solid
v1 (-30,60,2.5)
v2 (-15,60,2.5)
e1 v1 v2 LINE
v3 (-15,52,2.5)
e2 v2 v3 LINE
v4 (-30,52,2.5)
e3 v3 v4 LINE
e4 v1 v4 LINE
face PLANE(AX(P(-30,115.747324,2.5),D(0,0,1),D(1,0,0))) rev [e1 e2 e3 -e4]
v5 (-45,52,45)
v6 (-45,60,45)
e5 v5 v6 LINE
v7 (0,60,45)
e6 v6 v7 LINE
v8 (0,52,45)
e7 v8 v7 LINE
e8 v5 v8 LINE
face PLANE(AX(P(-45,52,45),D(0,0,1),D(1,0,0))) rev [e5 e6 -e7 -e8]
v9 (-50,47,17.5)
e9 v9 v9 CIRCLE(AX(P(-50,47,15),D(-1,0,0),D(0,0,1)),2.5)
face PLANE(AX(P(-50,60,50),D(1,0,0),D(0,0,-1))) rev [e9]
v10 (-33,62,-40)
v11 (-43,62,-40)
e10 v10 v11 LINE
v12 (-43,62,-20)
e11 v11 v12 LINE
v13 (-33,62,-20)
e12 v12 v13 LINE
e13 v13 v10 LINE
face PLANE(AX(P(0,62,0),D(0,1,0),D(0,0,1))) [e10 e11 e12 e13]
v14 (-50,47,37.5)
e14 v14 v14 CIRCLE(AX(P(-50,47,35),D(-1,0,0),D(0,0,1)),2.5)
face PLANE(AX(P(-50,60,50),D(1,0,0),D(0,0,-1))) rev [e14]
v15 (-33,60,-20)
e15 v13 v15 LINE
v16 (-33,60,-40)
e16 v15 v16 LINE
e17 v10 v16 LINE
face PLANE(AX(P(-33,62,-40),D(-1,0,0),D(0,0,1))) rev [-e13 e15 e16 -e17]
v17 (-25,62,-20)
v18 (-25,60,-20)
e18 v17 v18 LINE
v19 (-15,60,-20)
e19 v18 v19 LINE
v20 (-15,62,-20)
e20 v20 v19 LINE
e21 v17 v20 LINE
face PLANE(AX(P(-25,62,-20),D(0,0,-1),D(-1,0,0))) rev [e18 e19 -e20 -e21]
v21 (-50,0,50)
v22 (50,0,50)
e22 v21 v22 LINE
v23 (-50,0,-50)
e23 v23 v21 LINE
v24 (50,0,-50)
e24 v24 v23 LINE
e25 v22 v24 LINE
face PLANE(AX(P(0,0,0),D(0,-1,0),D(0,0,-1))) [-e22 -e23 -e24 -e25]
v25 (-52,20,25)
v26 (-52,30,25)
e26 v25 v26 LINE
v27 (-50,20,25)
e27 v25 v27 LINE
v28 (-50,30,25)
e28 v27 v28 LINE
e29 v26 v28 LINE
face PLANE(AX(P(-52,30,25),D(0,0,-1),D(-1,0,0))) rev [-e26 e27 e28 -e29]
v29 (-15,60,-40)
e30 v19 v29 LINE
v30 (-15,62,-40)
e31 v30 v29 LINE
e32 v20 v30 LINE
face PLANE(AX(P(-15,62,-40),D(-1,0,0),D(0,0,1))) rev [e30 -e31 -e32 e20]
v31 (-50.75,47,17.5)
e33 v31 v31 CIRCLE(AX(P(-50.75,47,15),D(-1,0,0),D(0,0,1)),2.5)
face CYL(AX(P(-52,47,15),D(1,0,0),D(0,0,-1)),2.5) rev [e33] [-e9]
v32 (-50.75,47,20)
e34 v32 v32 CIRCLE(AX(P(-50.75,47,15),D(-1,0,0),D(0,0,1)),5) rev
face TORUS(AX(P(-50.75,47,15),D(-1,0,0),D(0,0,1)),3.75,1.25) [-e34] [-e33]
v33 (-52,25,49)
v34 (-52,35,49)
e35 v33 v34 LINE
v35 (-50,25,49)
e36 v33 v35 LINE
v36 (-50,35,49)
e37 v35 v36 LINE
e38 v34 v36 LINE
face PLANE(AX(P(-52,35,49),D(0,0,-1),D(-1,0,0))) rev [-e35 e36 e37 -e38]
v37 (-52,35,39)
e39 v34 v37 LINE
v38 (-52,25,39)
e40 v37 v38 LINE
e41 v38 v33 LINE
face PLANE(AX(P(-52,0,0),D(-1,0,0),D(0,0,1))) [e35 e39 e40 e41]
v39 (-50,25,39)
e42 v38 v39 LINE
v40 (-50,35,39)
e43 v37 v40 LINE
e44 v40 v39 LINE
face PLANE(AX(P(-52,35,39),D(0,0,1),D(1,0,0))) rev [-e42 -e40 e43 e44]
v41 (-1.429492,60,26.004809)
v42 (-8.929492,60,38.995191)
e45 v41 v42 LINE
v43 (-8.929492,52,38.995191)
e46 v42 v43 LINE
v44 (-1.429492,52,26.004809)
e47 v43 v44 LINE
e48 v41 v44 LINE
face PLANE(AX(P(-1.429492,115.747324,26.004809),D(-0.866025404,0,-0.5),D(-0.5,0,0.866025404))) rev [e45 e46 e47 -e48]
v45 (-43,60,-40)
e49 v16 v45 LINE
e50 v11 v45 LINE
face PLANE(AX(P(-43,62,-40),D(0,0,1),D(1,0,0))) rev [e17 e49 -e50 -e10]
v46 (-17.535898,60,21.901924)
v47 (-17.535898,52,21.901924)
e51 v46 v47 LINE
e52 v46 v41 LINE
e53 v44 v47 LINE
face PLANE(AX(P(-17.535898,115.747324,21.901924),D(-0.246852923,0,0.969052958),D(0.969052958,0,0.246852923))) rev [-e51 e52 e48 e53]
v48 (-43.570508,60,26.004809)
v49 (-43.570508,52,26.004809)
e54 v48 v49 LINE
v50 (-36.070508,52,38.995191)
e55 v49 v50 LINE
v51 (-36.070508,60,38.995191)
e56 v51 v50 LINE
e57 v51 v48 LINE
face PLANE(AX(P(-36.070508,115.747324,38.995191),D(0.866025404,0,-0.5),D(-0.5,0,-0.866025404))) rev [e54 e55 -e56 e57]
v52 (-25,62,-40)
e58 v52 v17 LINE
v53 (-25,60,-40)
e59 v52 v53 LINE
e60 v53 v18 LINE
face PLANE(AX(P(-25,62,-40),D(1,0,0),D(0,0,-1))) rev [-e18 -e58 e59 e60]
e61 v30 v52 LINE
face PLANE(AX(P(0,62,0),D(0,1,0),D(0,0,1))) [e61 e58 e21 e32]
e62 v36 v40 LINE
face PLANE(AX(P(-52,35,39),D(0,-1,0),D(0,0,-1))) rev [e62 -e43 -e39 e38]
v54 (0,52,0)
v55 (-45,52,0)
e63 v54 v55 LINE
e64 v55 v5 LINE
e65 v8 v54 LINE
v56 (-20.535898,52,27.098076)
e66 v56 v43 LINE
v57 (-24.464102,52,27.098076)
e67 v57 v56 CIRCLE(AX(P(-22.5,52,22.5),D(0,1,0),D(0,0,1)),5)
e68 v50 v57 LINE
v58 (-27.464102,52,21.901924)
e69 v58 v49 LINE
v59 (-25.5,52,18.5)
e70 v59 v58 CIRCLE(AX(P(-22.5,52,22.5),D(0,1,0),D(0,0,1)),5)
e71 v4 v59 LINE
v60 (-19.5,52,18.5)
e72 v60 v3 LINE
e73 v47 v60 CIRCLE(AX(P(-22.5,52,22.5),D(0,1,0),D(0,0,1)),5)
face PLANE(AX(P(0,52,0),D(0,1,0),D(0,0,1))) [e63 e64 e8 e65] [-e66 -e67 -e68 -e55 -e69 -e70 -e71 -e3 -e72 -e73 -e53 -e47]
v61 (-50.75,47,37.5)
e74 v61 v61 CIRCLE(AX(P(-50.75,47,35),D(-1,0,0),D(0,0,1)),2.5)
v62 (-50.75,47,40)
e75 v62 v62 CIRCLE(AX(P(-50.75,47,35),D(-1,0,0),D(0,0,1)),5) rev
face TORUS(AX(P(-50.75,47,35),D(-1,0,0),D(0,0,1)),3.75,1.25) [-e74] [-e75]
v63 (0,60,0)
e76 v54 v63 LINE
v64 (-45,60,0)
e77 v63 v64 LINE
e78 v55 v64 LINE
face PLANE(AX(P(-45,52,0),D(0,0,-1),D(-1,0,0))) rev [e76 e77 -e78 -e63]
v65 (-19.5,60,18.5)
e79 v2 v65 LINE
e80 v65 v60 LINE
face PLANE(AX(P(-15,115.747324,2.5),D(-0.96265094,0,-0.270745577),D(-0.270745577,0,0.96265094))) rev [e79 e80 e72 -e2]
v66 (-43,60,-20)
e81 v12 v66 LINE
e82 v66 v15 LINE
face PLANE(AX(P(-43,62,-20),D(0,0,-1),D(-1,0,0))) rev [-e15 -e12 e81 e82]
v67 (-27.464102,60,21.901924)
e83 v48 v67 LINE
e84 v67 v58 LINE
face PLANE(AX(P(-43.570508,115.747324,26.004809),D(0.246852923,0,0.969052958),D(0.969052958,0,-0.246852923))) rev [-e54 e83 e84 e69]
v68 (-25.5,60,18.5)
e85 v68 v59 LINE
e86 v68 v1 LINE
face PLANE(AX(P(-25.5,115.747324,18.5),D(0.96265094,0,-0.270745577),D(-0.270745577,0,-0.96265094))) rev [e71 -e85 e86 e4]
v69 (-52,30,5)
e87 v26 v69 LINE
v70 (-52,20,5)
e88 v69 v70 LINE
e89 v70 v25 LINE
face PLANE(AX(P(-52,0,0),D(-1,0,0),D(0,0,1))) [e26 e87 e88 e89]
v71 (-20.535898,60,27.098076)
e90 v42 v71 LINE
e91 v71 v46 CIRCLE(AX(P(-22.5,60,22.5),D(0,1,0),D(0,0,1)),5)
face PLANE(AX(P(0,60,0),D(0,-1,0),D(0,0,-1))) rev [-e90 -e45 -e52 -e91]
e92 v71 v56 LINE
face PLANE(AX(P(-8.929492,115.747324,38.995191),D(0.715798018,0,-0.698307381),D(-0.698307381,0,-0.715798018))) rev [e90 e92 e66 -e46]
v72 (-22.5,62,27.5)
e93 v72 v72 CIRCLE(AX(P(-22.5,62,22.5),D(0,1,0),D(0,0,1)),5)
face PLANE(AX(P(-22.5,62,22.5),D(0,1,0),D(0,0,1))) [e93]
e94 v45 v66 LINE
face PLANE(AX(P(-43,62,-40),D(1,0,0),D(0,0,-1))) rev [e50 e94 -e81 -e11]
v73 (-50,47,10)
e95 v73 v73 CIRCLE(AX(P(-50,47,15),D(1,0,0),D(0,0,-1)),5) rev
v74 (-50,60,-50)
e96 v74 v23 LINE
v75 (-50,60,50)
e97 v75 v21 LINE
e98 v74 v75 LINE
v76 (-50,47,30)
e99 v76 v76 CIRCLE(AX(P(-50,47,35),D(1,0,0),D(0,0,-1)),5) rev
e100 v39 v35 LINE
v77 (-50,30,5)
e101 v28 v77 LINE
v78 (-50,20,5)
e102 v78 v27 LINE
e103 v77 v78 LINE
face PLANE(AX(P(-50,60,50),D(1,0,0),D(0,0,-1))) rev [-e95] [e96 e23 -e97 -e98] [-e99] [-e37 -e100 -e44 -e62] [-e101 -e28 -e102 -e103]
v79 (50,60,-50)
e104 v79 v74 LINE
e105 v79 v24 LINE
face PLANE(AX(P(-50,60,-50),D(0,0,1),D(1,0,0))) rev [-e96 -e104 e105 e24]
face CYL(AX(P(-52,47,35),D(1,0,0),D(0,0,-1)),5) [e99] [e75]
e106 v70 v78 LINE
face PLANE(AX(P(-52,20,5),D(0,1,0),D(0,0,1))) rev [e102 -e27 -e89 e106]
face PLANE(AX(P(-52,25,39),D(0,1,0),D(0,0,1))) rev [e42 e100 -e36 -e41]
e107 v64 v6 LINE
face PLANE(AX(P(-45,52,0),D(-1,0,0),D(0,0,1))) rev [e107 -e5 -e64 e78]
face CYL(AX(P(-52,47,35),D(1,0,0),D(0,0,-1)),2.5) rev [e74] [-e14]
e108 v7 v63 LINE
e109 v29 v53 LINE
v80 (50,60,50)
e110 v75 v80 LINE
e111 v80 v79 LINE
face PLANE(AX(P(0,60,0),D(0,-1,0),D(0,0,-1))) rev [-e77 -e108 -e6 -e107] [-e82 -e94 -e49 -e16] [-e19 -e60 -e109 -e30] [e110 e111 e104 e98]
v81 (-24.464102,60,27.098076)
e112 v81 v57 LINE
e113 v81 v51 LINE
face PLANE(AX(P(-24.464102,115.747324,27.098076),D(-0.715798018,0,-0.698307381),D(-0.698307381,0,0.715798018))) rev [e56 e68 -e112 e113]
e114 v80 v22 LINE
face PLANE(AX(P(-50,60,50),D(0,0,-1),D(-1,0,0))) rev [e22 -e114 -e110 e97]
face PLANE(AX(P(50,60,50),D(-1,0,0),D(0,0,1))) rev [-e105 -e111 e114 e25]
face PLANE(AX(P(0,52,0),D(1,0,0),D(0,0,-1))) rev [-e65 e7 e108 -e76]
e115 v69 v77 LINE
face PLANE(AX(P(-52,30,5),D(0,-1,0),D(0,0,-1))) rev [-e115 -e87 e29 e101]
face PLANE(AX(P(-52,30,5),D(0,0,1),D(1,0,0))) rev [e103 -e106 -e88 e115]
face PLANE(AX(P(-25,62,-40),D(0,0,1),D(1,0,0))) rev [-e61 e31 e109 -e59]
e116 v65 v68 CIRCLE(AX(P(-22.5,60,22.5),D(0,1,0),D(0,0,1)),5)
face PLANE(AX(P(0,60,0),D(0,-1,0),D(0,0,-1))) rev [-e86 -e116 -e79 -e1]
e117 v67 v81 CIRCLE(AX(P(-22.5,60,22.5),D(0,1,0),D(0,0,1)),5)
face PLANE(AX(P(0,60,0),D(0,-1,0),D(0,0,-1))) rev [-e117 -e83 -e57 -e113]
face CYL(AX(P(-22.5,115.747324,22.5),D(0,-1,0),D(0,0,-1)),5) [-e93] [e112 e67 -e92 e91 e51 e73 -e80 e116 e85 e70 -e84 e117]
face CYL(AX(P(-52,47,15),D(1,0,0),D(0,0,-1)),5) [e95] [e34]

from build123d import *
from build123d.topology import SkipClean

# Parameters (mm, degrees)
SKETCH_1_W          = 100
SKETCH_1_H          = 100
EXTRUDE_1_DEPTH     = 60
SKETCH_2_W          = 45
SKETCH_2_H          = 45
CUT_EXTRUDE_1_DEPTH = 8
SKETCH_3_W          = 10
SKETCH_3_H          = 20
EXTRUDE_2_DEPTH     = 2
SKETCH_4_W          = 20
SKETCH_4_H          = 10
SKETCH_4_W_2        = 10
EXTRUDE_3_DEPTH     = 2
SKETCH_5_R          = 5
SKETCH_5_R_2        = 2.5
EXTRUDE_4_DEPTH     = 2
FILLET_1_R          = 1.25
FILLET_2_R          = 1.25
EXTRUDE_5_DEPTH     = 8
SKETCH_7_R          = 5
EXTRUDE_6_DEPTH     = 2


with BuildPart() as part:
    # 草图1 → 凸台-拉伸1 (new body)
    with BuildSketch(Plane(origin=(0, 0, 0), x_dir=(1, 0, 0), z_dir=(0, 1, 0))):
        Rectangle(SKETCH_1_W, SKETCH_1_H)
    extrude(amount=EXTRUDE_1_DEPTH)

    # 草图2 → 切除-拉伸1 (cut)
    with BuildSketch(Plane(origin=(0, 60, 0), x_dir=(1, 0, 0), z_dir=(0, 1, 0))):
        with Locations((-22.5, -22.5)):
            Rectangle(SKETCH_2_W, SKETCH_2_H)
    extrude(amount=-CUT_EXTRUDE_1_DEPTH, mode=Mode.SUBTRACT)

    # 草图3 → 凸台-拉伸2 (add)
    with BuildSketch(Plane(origin=(0, 60, 0), x_dir=(1, 0, 0), z_dir=(0, 1, 0))):
        with Locations((-38, 30)):
            Rectangle(SKETCH_3_W, SKETCH_3_H)
        with Locations((-20, 30)):
            Rectangle(SKETCH_3_W, SKETCH_3_H)
    extrude(amount=EXTRUDE_2_DEPTH)

    # 草图4 → 凸台-拉伸3 (add)
    with BuildSketch(Plane.ZY.offset(50)):
        with Locations((15, 25)):
            Rectangle(SKETCH_4_W, SKETCH_4_H)
        with Locations((44, 30)):
            Rectangle(SKETCH_4_W_2, SKETCH_4_H)
    extrude(amount=EXTRUDE_3_DEPTH)

    # 草图5 → 凸台-拉伸4 (add)
    # profile 1 of 2: a face of its own
    with BuildSketch(Plane.ZY.offset(50)):
        with Locations(Location((15, 47, 0), (0, 0, 180))):
            Circle(SKETCH_5_R)
        with Locations((15, 47)):
            Circle(SKETCH_5_R_2, mode=Mode.SUBTRACT)
    # profile 2 of 2: a face of its own
    with BuildSketch(Plane.ZY.offset(50)):
        with Locations(Location((35, 47, 0), (0, 0, 180))):
            Circle(SKETCH_5_R)
        with Locations((35, 47)):
            Circle(SKETCH_5_R_2, mode=Mode.SUBTRACT)
    extrude(amount=EXTRUDE_4_DEPTH)

    # 圆角1
    fillet_1_edges = [part.edges().sort_by_distance(p)[0] for p in [
        (-52, 47, 20),
        (-52, 47, 12.5),
    ]]
    fillet(fillet_1_edges, radius=FILLET_1_R - 0.0001)  # a hair under: the kernel refuses the full size

    # 圆角2
    fillet_2_edges = [part.edges().sort_by_distance(p)[0] for p in [
        (-52, 47, 40),
        (-52, 47, 32.5),
    ]]
    fillet(fillet_2_edges, radius=FILLET_2_R - 0.0001)  # a hair under: the kernel refuses the full size

    # 草图6 → 凸台-拉伸5 (add)
    with BuildSketch(Plane(origin=(0, 52, 0), x_dir=(1, 0, 0), z_dir=(0, 1, 0))):
        with BuildLine():
            Line((-25.5, -18.5), (-30, -2.5))
            Line((-30, -2.5), (-15, -2.5))
            Line((-15, -2.5), (-19.5, -18.5))
            ThreePointArc((-19.5, -18.5), (-18.169872981, -20), (-17.535898385, -21.901923789))
            Line((-17.535898385, -21.901923789), (-1.429491924, -26.004809472))
            Line((-1.429491924, -26.004809472), (-8.929491924, -38.995190528))
            Line((-8.929491924, -38.995190528), (-20.535898385, -27.098076211))
            ThreePointArc((-20.535898385, -27.098076211), (-22.5, -27.5), (-24.464101615, -27.098076211))
            Line((-24.464101615, -27.098076211), (-36.070508076, -38.995190528))
            Line((-36.070508076, -38.995190528), (-43.570508076, -26.004809472))
            Line((-43.570508076, -26.004809472), (-27.464101615, -21.901923789))
            ThreePointArc((-27.464101615, -21.901923789), (-26.830127019, -20), (-25.5, -18.5))
        make_face()
    extrude(amount=EXTRUDE_5_DEPTH)

    # 草图7 → 凸台-拉伸6 (add)
    with SkipClean():  # the faces are left unmerged after this step: merging them gives an invalid solid
        with BuildSketch(Plane(origin=(0, 60, 0), x_dir=(1, 0, 0), z_dir=(0, 1, 0))):
            with Locations(Location((-22.5, -22.5, 0), (0, 0, 53.130102354))):
                Circle(SKETCH_7_R)
        extrude(amount=EXTRUDE_6_DEPTH)


solid = part.part
